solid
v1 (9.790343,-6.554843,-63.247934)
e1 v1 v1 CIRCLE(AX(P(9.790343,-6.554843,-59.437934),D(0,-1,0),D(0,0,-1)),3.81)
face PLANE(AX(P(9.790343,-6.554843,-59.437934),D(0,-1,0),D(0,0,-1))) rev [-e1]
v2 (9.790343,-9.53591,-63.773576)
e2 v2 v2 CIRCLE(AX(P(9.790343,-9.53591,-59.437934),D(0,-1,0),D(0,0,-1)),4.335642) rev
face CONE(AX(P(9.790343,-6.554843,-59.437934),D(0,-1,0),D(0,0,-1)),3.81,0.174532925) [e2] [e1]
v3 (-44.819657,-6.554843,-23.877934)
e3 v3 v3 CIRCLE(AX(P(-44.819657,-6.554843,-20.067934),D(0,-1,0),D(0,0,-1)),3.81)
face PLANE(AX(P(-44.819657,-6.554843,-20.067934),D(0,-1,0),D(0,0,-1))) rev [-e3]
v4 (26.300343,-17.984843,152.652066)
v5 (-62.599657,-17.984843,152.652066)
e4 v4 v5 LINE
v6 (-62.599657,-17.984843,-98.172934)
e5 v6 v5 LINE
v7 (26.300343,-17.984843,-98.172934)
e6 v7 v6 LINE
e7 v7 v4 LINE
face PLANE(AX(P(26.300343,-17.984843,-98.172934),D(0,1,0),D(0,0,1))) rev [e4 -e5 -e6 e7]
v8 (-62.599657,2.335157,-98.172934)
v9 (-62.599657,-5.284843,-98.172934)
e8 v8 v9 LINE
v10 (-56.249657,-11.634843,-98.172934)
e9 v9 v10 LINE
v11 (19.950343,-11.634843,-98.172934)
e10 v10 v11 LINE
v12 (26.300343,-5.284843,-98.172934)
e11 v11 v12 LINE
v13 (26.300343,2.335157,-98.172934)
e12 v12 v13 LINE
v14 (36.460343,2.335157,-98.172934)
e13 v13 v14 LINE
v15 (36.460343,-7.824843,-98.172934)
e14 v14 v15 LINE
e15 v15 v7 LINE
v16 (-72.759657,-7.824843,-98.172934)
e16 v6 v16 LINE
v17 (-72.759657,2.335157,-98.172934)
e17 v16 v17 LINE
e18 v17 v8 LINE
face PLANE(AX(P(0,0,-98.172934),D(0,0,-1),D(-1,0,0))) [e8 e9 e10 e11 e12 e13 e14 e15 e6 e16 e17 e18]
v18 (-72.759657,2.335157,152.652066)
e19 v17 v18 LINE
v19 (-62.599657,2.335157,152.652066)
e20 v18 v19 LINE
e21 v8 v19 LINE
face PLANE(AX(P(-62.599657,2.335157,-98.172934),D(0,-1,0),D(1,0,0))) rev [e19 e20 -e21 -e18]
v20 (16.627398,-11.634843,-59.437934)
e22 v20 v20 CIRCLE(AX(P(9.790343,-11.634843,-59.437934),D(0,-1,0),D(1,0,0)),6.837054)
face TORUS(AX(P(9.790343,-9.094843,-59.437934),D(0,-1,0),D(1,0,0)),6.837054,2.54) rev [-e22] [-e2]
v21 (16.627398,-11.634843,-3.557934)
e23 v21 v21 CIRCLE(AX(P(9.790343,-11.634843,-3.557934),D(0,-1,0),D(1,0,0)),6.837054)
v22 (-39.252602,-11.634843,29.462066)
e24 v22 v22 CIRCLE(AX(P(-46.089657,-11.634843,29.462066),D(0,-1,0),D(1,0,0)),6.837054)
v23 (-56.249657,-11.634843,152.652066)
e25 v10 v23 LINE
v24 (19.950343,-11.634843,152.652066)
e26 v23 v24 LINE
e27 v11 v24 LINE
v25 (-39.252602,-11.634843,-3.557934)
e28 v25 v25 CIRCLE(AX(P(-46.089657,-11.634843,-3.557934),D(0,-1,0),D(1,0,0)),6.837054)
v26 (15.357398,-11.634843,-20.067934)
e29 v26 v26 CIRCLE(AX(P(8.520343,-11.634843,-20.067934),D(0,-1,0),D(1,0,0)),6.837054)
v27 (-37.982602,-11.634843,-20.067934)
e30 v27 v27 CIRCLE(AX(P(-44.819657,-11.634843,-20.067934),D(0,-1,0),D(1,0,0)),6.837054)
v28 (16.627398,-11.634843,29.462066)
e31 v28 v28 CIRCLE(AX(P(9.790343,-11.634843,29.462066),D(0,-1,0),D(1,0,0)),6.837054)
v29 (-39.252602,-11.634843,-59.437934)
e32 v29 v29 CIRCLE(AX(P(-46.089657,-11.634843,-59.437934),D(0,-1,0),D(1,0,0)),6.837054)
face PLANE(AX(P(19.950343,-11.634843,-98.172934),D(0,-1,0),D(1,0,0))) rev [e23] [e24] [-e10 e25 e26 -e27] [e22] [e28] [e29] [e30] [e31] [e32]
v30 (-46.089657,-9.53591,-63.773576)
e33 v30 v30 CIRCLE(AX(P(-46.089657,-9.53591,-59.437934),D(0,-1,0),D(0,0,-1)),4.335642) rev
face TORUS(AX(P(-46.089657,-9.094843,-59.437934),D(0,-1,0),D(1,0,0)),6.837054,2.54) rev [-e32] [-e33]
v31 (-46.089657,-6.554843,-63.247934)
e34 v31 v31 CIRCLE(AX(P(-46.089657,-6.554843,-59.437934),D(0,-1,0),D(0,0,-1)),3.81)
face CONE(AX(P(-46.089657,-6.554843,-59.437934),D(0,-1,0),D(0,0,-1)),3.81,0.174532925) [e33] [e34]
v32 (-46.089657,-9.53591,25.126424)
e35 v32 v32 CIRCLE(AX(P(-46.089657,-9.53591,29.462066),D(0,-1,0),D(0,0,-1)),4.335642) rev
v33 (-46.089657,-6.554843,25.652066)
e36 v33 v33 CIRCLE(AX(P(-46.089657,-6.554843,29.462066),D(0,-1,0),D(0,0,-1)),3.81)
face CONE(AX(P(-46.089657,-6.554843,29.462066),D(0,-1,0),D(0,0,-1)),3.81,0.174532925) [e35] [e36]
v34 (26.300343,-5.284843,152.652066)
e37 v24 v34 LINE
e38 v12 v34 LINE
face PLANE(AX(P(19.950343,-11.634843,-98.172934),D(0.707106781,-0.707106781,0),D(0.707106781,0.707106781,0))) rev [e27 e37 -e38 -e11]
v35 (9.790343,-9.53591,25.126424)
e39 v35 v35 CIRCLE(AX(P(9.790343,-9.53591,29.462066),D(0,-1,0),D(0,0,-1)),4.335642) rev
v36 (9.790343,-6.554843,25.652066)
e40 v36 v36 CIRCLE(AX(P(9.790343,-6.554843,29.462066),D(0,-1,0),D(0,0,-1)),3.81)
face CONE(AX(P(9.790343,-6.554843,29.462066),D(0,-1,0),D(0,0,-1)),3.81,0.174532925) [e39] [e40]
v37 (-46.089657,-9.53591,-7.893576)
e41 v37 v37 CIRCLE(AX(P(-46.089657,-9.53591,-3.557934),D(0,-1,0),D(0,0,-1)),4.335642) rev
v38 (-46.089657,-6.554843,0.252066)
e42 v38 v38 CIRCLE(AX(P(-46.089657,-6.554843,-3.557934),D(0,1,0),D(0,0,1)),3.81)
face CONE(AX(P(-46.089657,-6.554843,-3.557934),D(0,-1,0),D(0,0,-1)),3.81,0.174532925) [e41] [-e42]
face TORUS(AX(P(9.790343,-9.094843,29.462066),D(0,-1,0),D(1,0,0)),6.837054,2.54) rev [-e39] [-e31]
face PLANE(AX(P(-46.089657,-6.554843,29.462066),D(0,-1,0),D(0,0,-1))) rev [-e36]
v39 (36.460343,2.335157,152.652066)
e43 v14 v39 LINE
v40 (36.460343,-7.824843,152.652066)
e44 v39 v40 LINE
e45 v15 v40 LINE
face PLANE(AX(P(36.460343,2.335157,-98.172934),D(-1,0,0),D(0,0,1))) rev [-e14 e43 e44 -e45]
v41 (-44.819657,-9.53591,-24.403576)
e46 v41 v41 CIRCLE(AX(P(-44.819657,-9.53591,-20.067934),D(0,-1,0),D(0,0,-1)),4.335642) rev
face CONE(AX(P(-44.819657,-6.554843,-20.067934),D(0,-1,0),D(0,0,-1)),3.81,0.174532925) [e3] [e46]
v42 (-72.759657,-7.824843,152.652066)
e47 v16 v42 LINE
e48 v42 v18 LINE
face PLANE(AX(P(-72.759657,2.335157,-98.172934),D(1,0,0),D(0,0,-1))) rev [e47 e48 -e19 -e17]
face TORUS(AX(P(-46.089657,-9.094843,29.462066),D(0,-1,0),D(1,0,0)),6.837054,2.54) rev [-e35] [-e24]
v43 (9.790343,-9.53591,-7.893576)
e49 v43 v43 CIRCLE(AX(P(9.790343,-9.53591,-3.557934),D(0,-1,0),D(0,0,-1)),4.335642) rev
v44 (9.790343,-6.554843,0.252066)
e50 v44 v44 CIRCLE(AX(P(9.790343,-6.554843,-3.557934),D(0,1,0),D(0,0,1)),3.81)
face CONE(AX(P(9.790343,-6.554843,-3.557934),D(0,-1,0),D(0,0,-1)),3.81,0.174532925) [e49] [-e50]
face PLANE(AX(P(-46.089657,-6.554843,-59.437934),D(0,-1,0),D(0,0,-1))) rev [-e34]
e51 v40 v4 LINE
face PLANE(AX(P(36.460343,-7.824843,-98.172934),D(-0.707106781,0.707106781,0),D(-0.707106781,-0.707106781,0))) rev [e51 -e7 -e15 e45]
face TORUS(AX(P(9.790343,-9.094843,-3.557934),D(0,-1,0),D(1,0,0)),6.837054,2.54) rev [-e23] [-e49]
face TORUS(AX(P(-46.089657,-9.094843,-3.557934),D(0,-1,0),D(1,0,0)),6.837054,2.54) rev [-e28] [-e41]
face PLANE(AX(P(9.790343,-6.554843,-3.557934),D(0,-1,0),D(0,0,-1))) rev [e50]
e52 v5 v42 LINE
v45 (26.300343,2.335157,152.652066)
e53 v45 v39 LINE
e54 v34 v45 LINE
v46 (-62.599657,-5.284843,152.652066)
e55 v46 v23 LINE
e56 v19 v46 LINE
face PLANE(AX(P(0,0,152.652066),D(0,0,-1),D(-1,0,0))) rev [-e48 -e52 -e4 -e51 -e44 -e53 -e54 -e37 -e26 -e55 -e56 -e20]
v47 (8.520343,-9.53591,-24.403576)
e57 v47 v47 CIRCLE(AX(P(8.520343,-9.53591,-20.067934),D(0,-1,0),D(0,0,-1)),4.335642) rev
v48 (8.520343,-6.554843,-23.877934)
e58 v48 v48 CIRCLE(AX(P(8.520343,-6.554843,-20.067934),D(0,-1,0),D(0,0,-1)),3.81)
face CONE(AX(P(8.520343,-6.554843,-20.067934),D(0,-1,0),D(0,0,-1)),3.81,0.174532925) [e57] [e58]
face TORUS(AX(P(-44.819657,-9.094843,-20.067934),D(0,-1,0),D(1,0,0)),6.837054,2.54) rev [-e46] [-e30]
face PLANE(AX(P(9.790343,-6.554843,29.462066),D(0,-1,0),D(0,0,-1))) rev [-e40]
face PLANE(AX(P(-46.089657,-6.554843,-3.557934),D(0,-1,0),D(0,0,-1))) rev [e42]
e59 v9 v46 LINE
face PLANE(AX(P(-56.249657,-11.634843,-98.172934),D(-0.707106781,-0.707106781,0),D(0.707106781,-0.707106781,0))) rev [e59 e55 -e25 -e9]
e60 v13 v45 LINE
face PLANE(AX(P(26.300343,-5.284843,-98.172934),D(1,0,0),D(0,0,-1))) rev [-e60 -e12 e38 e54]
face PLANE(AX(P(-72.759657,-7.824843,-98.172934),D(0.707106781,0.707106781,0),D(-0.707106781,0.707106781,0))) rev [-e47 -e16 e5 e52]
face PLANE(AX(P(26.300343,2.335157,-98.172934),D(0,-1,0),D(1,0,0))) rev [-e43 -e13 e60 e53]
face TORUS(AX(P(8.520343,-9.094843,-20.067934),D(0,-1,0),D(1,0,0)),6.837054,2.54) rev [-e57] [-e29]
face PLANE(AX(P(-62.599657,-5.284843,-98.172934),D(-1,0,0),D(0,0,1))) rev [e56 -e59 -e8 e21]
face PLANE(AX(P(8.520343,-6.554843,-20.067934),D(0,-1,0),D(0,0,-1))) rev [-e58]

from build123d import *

# Parameters (mm, degrees)
BASE_START                    = -6.554843364
BASE_OUTLINE_R                = 2.2098
BASE_DEPTH                    = 1.5875
SKETCH1_R                     = 3.81
BOSS_EXTRUDE1_DEPTH           = 5.08
BOSS_EXTRUDE1_DRAFT           = -10
BOSS_EXTRUDE1_PROFILE_2_DEPTH = 5.08
BOSS_EXTRUDE1_PROFILE_2_DRAFT = -10
BOSS_EXTRUDE1_PROFILE_3_DEPTH = 5.08
BOSS_EXTRUDE1_PROFILE_3_DRAFT = -10
BOSS_EXTRUDE1_PROFILE_4_DEPTH = 5.08
BOSS_EXTRUDE1_PROFILE_4_DRAFT = -10
BOSS_EXTRUDE1_PROFILE_5_DEPTH = 5.08
BOSS_EXTRUDE1_PROFILE_5_DRAFT = -10
BOSS_EXTRUDE1_PROFILE_6_DEPTH = 5.08
BOSS_EXTRUDE1_PROFILE_6_DRAFT = -10
BOSS_EXTRUDE1_PROFILE_7_DEPTH = 5.08
BOSS_EXTRUDE1_PROFILE_7_DRAFT = -10
BOSS_EXTRUDE1_PROFILE_8_DEPTH = 5.08
BOSS_EXTRUDE1_PROFILE_8_DRAFT = -10
BOSS_EXTRUDE2_DEPTH           = 34.925
BOSS_EXTRUDE2_DEPTH_BACK      = 215.9
CUT_EXTRUDE1_START            = -1.5875
CUT_EXTRUDE1_DEPTH            = 1.5875
FILLET1_R                     = 2.54


# Read off the part's stored shape, not the designer's step: base
with BuildPart() as part:
    # base outline → base (new body)
    with BuildSketch(Plane(origin=(0, 0, 0), x_dir=(1, 0, 0), z_dir=(0, 1, 0)).offset(BASE_START)):
        with BuildLine():
            Line((-49.899656567, 12.447933824), (-49.899656567, -30.732066176))
            ThreePointArc((-49.899656567, -30.732066176), (-49.155707791, -32.5281174), (-47.359656567, -33.272066176))
            Line((-47.359656567, -33.272066176), (11.060343433, -33.272066176))
            ThreePointArc((11.060343433, -33.272066176), (12.856394657, -32.5281174), (13.600343433, -30.732066176))
            Line((13.600343433, -30.732066176), (13.600343433, 12.447933824))
            ThreePointArc((13.600343433, 12.447933824), (12.856394657, 14.243985048), (11.060343433, 14.987933824))
            Line((11.060343433, 14.987933824), (8.520343433, 14.987933824))
            ThreePointArc((8.520343433, 14.987933824), (3.440343433, 20.067933824), (8.520343433, 25.147933824))
            Line((8.520343433, 25.147933824), (11.060343433, 25.147933824))
            ThreePointArc((11.060343433, 25.147933824), (12.856394657, 25.8918826), (13.600343433, 27.687933824))
            Line((13.600343433, 27.687933824), (13.600343433, 60.707933824))
            ThreePointArc((13.600343433, 60.707933824), (12.856394657, 62.503985048), (11.060343433, 63.247933824))
            Line((11.060343433, 63.247933824), (-47.359656567, 63.247933824))
            ThreePointArc((-47.359656567, 63.247933824), (-49.155707791, 62.503985048), (-49.899656567, 60.707933824))
            Line((-49.899656567, 60.707933824), (-49.899656567, 27.687933824))
            ThreePointArc((-49.899656567, 27.687933824), (-49.155707791, 25.8918826), (-47.359656567, 25.147933824))
            Line((-47.359656567, 25.147933824), (-44.819656567, 25.147933824))
            ThreePointArc((-44.819656567, 25.147933824), (-39.739656567, 20.067933824), (-44.819656567, 14.987933824))
            Line((-44.819656567, 14.987933824), (-47.359656567, 14.987933824))
            ThreePointArc((-47.359656567, 14.987933824), (-49.155707791, 14.243985048), (-49.899656567, 12.447933824))
        make_face()
        with Locations((-46.089656567, -29.462066176)):
            Circle(BASE_OUTLINE_R, mode=Mode.SUBTRACT)
        with Locations((-46.089656567, 3.557933824)):
            Circle(BASE_OUTLINE_R, mode=Mode.SUBTRACT)
        with Locations((9.790343433, -29.462066176)):
            Circle(BASE_OUTLINE_R, mode=Mode.SUBTRACT)
        with Locations((9.790343433, 3.557933824)):
            Circle(BASE_OUTLINE_R, mode=Mode.SUBTRACT)
        with Locations((-46.089656567, 59.437933824)):
            Circle(BASE_OUTLINE_R, mode=Mode.SUBTRACT)
        with Locations((9.790343433, 59.437933824)):
            Circle(BASE_OUTLINE_R, mode=Mode.SUBTRACT)
    extrude(amount=BASE_DEPTH)


with BuildPart() as boss_extrude1_tool:
    # Sketch1 → Boss-Extrude1 (with draft: the straight prism first)
    with BuildSketch(Plane.XZ.offset(6.554843364)):
        with Locations((-46.089656567, -59.437933824)):
            Circle(SKETCH1_R)
    extrude(amount=BOSS_EXTRUDE1_DEPTH)
    # Boss-Extrude1: the draft: its side faces are tilted about the plane it starts from
    boss_extrude1_sides = [boss_extrude1_tool.faces().sort_by_distance(p)[0] for p in [
        (-49.899656567, -9.094843364, -59.437933824),
    ]]
    draft(boss_extrude1_sides, Plane.XZ.offset(6.554843364), BOSS_EXTRUDE1_DRAFT)


with BuildPart() as part_1:
    add(part.part)

    # Boss-Extrude1: add boss_extrude1_tool
    add(boss_extrude1_tool.part)


with BuildPart() as boss_extrude1_profile_2_tool:
    # Sketch1 → Boss-Extrude1 profile 2 (with draft: the straight prism first)
    with BuildSketch(Plane.XZ.offset(6.554843364)):
        with Locations((-46.089656567, -3.557933824)):
            Circle(SKETCH1_R)
    extrude(amount=BOSS_EXTRUDE1_PROFILE_2_DEPTH)
    # Boss-Extrude1 profile 2: the draft: its side faces are tilted about the plane it starts from
    boss_extrude1_profile_2_sides = [boss_extrude1_profile_2_tool.faces().sort_by_distance(p)[0] for p in [
        (-49.899656567, -9.094843364, -3.557933824),
    ]]
    draft(boss_extrude1_profile_2_sides, Plane.XZ.offset(6.554843364), BOSS_EXTRUDE1_PROFILE_2_DRAFT)


with BuildPart() as part_2:
    add(part_1.part)

    # Boss-Extrude1 profile 2: add boss_extrude1_profile_2_tool
    add(boss_extrude1_profile_2_tool.part)


with BuildPart() as boss_extrude1_profile_3_tool:
    # Sketch1 → Boss-Extrude1 profile 3 (with draft: the straight prism first)
    with BuildSketch(Plane.XZ.offset(6.554843364)):
        with Locations((-46.089656567, 29.462066176)):
            Circle(SKETCH1_R)
    extrude(amount=BOSS_EXTRUDE1_PROFILE_3_DEPTH)
    # Boss-Extrude1 profile 3: the draft: its side faces are tilted about the plane it starts from
    boss_extrude1_profile_3_sides = [boss_extrude1_profile_3_tool.faces().sort_by_distance(p)[0] for p in [
        (-49.899656567, -9.094843364, 29.462066176),
    ]]
    draft(boss_extrude1_profile_3_sides, Plane.XZ.offset(6.554843364), BOSS_EXTRUDE1_PROFILE_3_DRAFT)


with BuildPart() as part_3:
    add(part_2.part)

    # Boss-Extrude1 profile 3: add boss_extrude1_profile_3_tool
    add(boss_extrude1_profile_3_tool.part)


with BuildPart() as boss_extrude1_profile_4_tool:
    # Sketch1 → Boss-Extrude1 profile 4 (with draft: the straight prism first)
    with BuildSketch(Plane.XZ.offset(6.554843364)):
        with Locations((9.790343433, 29.462066176)):
            Circle(SKETCH1_R)
    extrude(amount=BOSS_EXTRUDE1_PROFILE_4_DEPTH)
    # Boss-Extrude1 profile 4: the draft: its side faces are tilted about the plane it starts from
    boss_extrude1_profile_4_sides = [boss_extrude1_profile_4_tool.faces().sort_by_distance(p)[0] for p in [
        (5.980343433, -9.094843364, 29.462066176),
    ]]
    draft(boss_extrude1_profile_4_sides, Plane.XZ.offset(6.554843364), BOSS_EXTRUDE1_PROFILE_4_DRAFT)


with BuildPart() as part_4:
    add(part_3.part)

    # Boss-Extrude1 profile 4: add boss_extrude1_profile_4_tool
    add(boss_extrude1_profile_4_tool.part)


with BuildPart() as boss_extrude1_profile_5_tool:
    # Sketch1 → Boss-Extrude1 profile 5 (with draft: the straight prism first)
    with BuildSketch(Plane.XZ.offset(6.554843364)):
        with Locations((9.790343433, -3.557933824)):
            Circle(SKETCH1_R)
    extrude(amount=BOSS_EXTRUDE1_PROFILE_5_DEPTH)
    # Boss-Extrude1 profile 5: the draft: its side faces are tilted about the plane it starts from
    boss_extrude1_profile_5_sides = [boss_extrude1_profile_5_tool.faces().sort_by_distance(p)[0] for p in [
        (5.980343433, -9.094843364, -3.557933824),
    ]]
    draft(boss_extrude1_profile_5_sides, Plane.XZ.offset(6.554843364), BOSS_EXTRUDE1_PROFILE_5_DRAFT)


with BuildPart() as part_5:
    add(part_4.part)

    # Boss-Extrude1 profile 5: add boss_extrude1_profile_5_tool
    add(boss_extrude1_profile_5_tool.part)


with BuildPart() as boss_extrude1_profile_6_tool:
    # Sketch1 → Boss-Extrude1 profile 6 (with draft: the straight prism first)
    with BuildSketch(Plane.XZ.offset(6.554843364)):
        with Locations((9.790343433, -59.437933824)):
            Circle(SKETCH1_R)
    extrude(amount=BOSS_EXTRUDE1_PROFILE_6_DEPTH)
    # Boss-Extrude1 profile 6: the draft: its side faces are tilted about the plane it starts from
    boss_extrude1_profile_6_sides = [boss_extrude1_profile_6_tool.faces().sort_by_distance(p)[0] for p in [
        (5.980343433, -9.094843364, -59.437933824),
    ]]
    draft(boss_extrude1_profile_6_sides, Plane.XZ.offset(6.554843364), BOSS_EXTRUDE1_PROFILE_6_DRAFT)


with BuildPart() as part_6:
    add(part_5.part)

    # Boss-Extrude1 profile 6: add boss_extrude1_profile_6_tool
    add(boss_extrude1_profile_6_tool.part)



with BuildPart() as body_2:
    # Sketch1 → Boss-Extrude1 profile 7 (with draft: the straight prism first)
    with BuildSketch(Plane.XZ.offset(6.554843364)):
        with Locations((8.520343433, -20.067933824)):
            Circle(SKETCH1_R)
    extrude(amount=BOSS_EXTRUDE1_PROFILE_7_DEPTH)
    # Boss-Extrude1 profile 7: the draft: its side faces are tilted about the plane it starts from
    boss_extrude1_profile_7_sides = [body_2.faces().sort_by_distance(p)[0] for p in [
        (4.710343433, -9.094843364, -20.067933824),
    ]]
    draft(boss_extrude1_profile_7_sides, Plane.XZ.offset(6.554843364), BOSS_EXTRUDE1_PROFILE_7_DRAFT)


with BuildPart() as body_3:
    # Sketch1 → Boss-Extrude1 profile 8 (with draft: the straight prism first)
    with BuildSketch(Plane.XZ.offset(6.554843364)):
        with Locations((-44.819656567, -20.067933824)):
            Circle(SKETCH1_R)
    extrude(amount=BOSS_EXTRUDE1_PROFILE_8_DEPTH)
    # Boss-Extrude1 profile 8: the draft: its side faces are tilted about the plane it starts from
    boss_extrude1_profile_8_sides = [body_3.faces().sort_by_distance(p)[0] for p in [
        (-48.629656567, -9.094843364, -20.067933824),
    ]]
    draft(boss_extrude1_profile_8_sides, Plane.XZ.offset(6.554843364), BOSS_EXTRUDE1_PROFILE_8_DRAFT)


with BuildPart() as part_7:
    add(part_6.part)

    add(body_2.part)  # Boss-Extrude2 merges body 2

    add(body_3.part)  # Boss-Extrude2 merges body 3
    # Sketch2 → Boss-Extrude2 (add, two sides: drawn at the far end of the back side and taken through both)
    with BuildSketch(Plane(origin=(0, 0, -63.247933824), x_dir=(-1, 0, 0), z_dir=(0, 0, -1)).offset(-BOSS_EXTRUDE2_DEPTH_BACK)):
        Polygon((-19.950343433, -11.634843364), (56.249656567, -11.634843364), (62.599656567, -5.284843364), (62.599656567, 2.335156636), (72.759656567, 2.335156636), (72.759656567, -7.824843364), (62.599656567, -17.984843364), (-26.300343433, -17.984843364), (-36.460343433, -7.824843364), (-36.460343433, 2.335156636), (-26.300343433, 2.335156636), (-26.300343433, -5.284843364), align=None)
    extrude(amount=BOSS_EXTRUDE2_DEPTH + BOSS_EXTRUDE2_DEPTH_BACK)

    # Sketch3 → Cut-Extrude1 (cut)
    with BuildSketch(Plane(origin=(0, -4.967343364, 0), x_dir=(1, 0, 0), z_dir=(0, 1, 0)).offset(CUT_EXTRUDE1_START)):
        with BuildLine():
            Line((-47.359656567, -33.272066176), (11.060343433, -33.272066176))
            ThreePointArc((11.060343433, -33.272066176), (12.856394657, -32.5281174), (13.600343433, -30.732066176))
            Line((13.600343433, -30.732066176), (13.600343433, 12.447933824))
            ThreePointArc((13.600343433, 12.447933824), (12.856394657, 14.243985048), (11.060343433, 14.987933824))
            Line((11.060343433, 14.987933824), (8.520343433, 14.987933824))
            ThreePointArc((8.520343433, 14.987933824), (3.440343433, 20.067933824), (8.520343433, 25.147933824))
            Line((8.520343433, 25.147933824), (11.060343433, 25.147933824))
            ThreePointArc((11.060343433, 25.147933824), (12.856394657, 25.8918826), (13.600343433, 27.687933824))
            Line((13.600343433, 27.687933824), (13.600343433, 60.707933824))
            ThreePointArc((13.600343433, 60.707933824), (12.856394657, 62.503985048), (11.060343433, 63.247933824))
            Line((11.060343433, 63.247933824), (-47.359656567, 63.247933824))
            ThreePointArc((-47.359656567, 63.247933824), (-49.155707791, 62.503985048), (-49.899656567, 60.707933824))
            Line((-49.899656567, 60.707933824), (-49.899656567, 27.687933824))
            ThreePointArc((-49.899656567, 27.687933824), (-49.155707791, 25.8918826), (-47.359656567, 25.147933824))
            Line((-47.359656567, 25.147933824), (-44.819656567, 25.147933824))
            ThreePointArc((-44.819656567, 25.147933824), (-39.739656567, 20.067933824), (-44.819656567, 14.987933824))
            Line((-44.819656567, 14.987933824), (-47.359656567, 14.987933824))
            ThreePointArc((-47.359656567, 14.987933824), (-49.155707791, 14.243985048), (-49.899656567, 12.447933824))
            Line((-49.899656567, 12.447933824), (-49.899656567, -30.732066176))
            ThreePointArc((-49.899656567, -30.732066176), (-49.155707791, -32.5281174), (-47.359656567, -33.272066176))
        make_face()
    extrude(amount=CUT_EXTRUDE1_DEPTH, mode=Mode.SUBTRACT)

    # Fillet1
    fillet1_edges = [part_7.edges().sort_by_distance(p)[0] for p in [
        (-50.795397629, -11.634843364, -59.437933824),
        (-50.795397629, -11.634843364, -3.557933824),
        (-50.795397629, -11.634843364, 29.462066176),
        (5.084602371, -11.634843364, 29.462066176),
        (5.084602371, -11.634843364, -3.557933824),
        (5.084602371, -11.634843364, -59.437933824),
        (3.814602371, -11.634843364, -20.067933824),
        (-49.525397629, -11.634843364, -20.067933824),
    ]]
    fillet(fillet1_edges, radius=FILLET1_R)


solid = part_7.part
